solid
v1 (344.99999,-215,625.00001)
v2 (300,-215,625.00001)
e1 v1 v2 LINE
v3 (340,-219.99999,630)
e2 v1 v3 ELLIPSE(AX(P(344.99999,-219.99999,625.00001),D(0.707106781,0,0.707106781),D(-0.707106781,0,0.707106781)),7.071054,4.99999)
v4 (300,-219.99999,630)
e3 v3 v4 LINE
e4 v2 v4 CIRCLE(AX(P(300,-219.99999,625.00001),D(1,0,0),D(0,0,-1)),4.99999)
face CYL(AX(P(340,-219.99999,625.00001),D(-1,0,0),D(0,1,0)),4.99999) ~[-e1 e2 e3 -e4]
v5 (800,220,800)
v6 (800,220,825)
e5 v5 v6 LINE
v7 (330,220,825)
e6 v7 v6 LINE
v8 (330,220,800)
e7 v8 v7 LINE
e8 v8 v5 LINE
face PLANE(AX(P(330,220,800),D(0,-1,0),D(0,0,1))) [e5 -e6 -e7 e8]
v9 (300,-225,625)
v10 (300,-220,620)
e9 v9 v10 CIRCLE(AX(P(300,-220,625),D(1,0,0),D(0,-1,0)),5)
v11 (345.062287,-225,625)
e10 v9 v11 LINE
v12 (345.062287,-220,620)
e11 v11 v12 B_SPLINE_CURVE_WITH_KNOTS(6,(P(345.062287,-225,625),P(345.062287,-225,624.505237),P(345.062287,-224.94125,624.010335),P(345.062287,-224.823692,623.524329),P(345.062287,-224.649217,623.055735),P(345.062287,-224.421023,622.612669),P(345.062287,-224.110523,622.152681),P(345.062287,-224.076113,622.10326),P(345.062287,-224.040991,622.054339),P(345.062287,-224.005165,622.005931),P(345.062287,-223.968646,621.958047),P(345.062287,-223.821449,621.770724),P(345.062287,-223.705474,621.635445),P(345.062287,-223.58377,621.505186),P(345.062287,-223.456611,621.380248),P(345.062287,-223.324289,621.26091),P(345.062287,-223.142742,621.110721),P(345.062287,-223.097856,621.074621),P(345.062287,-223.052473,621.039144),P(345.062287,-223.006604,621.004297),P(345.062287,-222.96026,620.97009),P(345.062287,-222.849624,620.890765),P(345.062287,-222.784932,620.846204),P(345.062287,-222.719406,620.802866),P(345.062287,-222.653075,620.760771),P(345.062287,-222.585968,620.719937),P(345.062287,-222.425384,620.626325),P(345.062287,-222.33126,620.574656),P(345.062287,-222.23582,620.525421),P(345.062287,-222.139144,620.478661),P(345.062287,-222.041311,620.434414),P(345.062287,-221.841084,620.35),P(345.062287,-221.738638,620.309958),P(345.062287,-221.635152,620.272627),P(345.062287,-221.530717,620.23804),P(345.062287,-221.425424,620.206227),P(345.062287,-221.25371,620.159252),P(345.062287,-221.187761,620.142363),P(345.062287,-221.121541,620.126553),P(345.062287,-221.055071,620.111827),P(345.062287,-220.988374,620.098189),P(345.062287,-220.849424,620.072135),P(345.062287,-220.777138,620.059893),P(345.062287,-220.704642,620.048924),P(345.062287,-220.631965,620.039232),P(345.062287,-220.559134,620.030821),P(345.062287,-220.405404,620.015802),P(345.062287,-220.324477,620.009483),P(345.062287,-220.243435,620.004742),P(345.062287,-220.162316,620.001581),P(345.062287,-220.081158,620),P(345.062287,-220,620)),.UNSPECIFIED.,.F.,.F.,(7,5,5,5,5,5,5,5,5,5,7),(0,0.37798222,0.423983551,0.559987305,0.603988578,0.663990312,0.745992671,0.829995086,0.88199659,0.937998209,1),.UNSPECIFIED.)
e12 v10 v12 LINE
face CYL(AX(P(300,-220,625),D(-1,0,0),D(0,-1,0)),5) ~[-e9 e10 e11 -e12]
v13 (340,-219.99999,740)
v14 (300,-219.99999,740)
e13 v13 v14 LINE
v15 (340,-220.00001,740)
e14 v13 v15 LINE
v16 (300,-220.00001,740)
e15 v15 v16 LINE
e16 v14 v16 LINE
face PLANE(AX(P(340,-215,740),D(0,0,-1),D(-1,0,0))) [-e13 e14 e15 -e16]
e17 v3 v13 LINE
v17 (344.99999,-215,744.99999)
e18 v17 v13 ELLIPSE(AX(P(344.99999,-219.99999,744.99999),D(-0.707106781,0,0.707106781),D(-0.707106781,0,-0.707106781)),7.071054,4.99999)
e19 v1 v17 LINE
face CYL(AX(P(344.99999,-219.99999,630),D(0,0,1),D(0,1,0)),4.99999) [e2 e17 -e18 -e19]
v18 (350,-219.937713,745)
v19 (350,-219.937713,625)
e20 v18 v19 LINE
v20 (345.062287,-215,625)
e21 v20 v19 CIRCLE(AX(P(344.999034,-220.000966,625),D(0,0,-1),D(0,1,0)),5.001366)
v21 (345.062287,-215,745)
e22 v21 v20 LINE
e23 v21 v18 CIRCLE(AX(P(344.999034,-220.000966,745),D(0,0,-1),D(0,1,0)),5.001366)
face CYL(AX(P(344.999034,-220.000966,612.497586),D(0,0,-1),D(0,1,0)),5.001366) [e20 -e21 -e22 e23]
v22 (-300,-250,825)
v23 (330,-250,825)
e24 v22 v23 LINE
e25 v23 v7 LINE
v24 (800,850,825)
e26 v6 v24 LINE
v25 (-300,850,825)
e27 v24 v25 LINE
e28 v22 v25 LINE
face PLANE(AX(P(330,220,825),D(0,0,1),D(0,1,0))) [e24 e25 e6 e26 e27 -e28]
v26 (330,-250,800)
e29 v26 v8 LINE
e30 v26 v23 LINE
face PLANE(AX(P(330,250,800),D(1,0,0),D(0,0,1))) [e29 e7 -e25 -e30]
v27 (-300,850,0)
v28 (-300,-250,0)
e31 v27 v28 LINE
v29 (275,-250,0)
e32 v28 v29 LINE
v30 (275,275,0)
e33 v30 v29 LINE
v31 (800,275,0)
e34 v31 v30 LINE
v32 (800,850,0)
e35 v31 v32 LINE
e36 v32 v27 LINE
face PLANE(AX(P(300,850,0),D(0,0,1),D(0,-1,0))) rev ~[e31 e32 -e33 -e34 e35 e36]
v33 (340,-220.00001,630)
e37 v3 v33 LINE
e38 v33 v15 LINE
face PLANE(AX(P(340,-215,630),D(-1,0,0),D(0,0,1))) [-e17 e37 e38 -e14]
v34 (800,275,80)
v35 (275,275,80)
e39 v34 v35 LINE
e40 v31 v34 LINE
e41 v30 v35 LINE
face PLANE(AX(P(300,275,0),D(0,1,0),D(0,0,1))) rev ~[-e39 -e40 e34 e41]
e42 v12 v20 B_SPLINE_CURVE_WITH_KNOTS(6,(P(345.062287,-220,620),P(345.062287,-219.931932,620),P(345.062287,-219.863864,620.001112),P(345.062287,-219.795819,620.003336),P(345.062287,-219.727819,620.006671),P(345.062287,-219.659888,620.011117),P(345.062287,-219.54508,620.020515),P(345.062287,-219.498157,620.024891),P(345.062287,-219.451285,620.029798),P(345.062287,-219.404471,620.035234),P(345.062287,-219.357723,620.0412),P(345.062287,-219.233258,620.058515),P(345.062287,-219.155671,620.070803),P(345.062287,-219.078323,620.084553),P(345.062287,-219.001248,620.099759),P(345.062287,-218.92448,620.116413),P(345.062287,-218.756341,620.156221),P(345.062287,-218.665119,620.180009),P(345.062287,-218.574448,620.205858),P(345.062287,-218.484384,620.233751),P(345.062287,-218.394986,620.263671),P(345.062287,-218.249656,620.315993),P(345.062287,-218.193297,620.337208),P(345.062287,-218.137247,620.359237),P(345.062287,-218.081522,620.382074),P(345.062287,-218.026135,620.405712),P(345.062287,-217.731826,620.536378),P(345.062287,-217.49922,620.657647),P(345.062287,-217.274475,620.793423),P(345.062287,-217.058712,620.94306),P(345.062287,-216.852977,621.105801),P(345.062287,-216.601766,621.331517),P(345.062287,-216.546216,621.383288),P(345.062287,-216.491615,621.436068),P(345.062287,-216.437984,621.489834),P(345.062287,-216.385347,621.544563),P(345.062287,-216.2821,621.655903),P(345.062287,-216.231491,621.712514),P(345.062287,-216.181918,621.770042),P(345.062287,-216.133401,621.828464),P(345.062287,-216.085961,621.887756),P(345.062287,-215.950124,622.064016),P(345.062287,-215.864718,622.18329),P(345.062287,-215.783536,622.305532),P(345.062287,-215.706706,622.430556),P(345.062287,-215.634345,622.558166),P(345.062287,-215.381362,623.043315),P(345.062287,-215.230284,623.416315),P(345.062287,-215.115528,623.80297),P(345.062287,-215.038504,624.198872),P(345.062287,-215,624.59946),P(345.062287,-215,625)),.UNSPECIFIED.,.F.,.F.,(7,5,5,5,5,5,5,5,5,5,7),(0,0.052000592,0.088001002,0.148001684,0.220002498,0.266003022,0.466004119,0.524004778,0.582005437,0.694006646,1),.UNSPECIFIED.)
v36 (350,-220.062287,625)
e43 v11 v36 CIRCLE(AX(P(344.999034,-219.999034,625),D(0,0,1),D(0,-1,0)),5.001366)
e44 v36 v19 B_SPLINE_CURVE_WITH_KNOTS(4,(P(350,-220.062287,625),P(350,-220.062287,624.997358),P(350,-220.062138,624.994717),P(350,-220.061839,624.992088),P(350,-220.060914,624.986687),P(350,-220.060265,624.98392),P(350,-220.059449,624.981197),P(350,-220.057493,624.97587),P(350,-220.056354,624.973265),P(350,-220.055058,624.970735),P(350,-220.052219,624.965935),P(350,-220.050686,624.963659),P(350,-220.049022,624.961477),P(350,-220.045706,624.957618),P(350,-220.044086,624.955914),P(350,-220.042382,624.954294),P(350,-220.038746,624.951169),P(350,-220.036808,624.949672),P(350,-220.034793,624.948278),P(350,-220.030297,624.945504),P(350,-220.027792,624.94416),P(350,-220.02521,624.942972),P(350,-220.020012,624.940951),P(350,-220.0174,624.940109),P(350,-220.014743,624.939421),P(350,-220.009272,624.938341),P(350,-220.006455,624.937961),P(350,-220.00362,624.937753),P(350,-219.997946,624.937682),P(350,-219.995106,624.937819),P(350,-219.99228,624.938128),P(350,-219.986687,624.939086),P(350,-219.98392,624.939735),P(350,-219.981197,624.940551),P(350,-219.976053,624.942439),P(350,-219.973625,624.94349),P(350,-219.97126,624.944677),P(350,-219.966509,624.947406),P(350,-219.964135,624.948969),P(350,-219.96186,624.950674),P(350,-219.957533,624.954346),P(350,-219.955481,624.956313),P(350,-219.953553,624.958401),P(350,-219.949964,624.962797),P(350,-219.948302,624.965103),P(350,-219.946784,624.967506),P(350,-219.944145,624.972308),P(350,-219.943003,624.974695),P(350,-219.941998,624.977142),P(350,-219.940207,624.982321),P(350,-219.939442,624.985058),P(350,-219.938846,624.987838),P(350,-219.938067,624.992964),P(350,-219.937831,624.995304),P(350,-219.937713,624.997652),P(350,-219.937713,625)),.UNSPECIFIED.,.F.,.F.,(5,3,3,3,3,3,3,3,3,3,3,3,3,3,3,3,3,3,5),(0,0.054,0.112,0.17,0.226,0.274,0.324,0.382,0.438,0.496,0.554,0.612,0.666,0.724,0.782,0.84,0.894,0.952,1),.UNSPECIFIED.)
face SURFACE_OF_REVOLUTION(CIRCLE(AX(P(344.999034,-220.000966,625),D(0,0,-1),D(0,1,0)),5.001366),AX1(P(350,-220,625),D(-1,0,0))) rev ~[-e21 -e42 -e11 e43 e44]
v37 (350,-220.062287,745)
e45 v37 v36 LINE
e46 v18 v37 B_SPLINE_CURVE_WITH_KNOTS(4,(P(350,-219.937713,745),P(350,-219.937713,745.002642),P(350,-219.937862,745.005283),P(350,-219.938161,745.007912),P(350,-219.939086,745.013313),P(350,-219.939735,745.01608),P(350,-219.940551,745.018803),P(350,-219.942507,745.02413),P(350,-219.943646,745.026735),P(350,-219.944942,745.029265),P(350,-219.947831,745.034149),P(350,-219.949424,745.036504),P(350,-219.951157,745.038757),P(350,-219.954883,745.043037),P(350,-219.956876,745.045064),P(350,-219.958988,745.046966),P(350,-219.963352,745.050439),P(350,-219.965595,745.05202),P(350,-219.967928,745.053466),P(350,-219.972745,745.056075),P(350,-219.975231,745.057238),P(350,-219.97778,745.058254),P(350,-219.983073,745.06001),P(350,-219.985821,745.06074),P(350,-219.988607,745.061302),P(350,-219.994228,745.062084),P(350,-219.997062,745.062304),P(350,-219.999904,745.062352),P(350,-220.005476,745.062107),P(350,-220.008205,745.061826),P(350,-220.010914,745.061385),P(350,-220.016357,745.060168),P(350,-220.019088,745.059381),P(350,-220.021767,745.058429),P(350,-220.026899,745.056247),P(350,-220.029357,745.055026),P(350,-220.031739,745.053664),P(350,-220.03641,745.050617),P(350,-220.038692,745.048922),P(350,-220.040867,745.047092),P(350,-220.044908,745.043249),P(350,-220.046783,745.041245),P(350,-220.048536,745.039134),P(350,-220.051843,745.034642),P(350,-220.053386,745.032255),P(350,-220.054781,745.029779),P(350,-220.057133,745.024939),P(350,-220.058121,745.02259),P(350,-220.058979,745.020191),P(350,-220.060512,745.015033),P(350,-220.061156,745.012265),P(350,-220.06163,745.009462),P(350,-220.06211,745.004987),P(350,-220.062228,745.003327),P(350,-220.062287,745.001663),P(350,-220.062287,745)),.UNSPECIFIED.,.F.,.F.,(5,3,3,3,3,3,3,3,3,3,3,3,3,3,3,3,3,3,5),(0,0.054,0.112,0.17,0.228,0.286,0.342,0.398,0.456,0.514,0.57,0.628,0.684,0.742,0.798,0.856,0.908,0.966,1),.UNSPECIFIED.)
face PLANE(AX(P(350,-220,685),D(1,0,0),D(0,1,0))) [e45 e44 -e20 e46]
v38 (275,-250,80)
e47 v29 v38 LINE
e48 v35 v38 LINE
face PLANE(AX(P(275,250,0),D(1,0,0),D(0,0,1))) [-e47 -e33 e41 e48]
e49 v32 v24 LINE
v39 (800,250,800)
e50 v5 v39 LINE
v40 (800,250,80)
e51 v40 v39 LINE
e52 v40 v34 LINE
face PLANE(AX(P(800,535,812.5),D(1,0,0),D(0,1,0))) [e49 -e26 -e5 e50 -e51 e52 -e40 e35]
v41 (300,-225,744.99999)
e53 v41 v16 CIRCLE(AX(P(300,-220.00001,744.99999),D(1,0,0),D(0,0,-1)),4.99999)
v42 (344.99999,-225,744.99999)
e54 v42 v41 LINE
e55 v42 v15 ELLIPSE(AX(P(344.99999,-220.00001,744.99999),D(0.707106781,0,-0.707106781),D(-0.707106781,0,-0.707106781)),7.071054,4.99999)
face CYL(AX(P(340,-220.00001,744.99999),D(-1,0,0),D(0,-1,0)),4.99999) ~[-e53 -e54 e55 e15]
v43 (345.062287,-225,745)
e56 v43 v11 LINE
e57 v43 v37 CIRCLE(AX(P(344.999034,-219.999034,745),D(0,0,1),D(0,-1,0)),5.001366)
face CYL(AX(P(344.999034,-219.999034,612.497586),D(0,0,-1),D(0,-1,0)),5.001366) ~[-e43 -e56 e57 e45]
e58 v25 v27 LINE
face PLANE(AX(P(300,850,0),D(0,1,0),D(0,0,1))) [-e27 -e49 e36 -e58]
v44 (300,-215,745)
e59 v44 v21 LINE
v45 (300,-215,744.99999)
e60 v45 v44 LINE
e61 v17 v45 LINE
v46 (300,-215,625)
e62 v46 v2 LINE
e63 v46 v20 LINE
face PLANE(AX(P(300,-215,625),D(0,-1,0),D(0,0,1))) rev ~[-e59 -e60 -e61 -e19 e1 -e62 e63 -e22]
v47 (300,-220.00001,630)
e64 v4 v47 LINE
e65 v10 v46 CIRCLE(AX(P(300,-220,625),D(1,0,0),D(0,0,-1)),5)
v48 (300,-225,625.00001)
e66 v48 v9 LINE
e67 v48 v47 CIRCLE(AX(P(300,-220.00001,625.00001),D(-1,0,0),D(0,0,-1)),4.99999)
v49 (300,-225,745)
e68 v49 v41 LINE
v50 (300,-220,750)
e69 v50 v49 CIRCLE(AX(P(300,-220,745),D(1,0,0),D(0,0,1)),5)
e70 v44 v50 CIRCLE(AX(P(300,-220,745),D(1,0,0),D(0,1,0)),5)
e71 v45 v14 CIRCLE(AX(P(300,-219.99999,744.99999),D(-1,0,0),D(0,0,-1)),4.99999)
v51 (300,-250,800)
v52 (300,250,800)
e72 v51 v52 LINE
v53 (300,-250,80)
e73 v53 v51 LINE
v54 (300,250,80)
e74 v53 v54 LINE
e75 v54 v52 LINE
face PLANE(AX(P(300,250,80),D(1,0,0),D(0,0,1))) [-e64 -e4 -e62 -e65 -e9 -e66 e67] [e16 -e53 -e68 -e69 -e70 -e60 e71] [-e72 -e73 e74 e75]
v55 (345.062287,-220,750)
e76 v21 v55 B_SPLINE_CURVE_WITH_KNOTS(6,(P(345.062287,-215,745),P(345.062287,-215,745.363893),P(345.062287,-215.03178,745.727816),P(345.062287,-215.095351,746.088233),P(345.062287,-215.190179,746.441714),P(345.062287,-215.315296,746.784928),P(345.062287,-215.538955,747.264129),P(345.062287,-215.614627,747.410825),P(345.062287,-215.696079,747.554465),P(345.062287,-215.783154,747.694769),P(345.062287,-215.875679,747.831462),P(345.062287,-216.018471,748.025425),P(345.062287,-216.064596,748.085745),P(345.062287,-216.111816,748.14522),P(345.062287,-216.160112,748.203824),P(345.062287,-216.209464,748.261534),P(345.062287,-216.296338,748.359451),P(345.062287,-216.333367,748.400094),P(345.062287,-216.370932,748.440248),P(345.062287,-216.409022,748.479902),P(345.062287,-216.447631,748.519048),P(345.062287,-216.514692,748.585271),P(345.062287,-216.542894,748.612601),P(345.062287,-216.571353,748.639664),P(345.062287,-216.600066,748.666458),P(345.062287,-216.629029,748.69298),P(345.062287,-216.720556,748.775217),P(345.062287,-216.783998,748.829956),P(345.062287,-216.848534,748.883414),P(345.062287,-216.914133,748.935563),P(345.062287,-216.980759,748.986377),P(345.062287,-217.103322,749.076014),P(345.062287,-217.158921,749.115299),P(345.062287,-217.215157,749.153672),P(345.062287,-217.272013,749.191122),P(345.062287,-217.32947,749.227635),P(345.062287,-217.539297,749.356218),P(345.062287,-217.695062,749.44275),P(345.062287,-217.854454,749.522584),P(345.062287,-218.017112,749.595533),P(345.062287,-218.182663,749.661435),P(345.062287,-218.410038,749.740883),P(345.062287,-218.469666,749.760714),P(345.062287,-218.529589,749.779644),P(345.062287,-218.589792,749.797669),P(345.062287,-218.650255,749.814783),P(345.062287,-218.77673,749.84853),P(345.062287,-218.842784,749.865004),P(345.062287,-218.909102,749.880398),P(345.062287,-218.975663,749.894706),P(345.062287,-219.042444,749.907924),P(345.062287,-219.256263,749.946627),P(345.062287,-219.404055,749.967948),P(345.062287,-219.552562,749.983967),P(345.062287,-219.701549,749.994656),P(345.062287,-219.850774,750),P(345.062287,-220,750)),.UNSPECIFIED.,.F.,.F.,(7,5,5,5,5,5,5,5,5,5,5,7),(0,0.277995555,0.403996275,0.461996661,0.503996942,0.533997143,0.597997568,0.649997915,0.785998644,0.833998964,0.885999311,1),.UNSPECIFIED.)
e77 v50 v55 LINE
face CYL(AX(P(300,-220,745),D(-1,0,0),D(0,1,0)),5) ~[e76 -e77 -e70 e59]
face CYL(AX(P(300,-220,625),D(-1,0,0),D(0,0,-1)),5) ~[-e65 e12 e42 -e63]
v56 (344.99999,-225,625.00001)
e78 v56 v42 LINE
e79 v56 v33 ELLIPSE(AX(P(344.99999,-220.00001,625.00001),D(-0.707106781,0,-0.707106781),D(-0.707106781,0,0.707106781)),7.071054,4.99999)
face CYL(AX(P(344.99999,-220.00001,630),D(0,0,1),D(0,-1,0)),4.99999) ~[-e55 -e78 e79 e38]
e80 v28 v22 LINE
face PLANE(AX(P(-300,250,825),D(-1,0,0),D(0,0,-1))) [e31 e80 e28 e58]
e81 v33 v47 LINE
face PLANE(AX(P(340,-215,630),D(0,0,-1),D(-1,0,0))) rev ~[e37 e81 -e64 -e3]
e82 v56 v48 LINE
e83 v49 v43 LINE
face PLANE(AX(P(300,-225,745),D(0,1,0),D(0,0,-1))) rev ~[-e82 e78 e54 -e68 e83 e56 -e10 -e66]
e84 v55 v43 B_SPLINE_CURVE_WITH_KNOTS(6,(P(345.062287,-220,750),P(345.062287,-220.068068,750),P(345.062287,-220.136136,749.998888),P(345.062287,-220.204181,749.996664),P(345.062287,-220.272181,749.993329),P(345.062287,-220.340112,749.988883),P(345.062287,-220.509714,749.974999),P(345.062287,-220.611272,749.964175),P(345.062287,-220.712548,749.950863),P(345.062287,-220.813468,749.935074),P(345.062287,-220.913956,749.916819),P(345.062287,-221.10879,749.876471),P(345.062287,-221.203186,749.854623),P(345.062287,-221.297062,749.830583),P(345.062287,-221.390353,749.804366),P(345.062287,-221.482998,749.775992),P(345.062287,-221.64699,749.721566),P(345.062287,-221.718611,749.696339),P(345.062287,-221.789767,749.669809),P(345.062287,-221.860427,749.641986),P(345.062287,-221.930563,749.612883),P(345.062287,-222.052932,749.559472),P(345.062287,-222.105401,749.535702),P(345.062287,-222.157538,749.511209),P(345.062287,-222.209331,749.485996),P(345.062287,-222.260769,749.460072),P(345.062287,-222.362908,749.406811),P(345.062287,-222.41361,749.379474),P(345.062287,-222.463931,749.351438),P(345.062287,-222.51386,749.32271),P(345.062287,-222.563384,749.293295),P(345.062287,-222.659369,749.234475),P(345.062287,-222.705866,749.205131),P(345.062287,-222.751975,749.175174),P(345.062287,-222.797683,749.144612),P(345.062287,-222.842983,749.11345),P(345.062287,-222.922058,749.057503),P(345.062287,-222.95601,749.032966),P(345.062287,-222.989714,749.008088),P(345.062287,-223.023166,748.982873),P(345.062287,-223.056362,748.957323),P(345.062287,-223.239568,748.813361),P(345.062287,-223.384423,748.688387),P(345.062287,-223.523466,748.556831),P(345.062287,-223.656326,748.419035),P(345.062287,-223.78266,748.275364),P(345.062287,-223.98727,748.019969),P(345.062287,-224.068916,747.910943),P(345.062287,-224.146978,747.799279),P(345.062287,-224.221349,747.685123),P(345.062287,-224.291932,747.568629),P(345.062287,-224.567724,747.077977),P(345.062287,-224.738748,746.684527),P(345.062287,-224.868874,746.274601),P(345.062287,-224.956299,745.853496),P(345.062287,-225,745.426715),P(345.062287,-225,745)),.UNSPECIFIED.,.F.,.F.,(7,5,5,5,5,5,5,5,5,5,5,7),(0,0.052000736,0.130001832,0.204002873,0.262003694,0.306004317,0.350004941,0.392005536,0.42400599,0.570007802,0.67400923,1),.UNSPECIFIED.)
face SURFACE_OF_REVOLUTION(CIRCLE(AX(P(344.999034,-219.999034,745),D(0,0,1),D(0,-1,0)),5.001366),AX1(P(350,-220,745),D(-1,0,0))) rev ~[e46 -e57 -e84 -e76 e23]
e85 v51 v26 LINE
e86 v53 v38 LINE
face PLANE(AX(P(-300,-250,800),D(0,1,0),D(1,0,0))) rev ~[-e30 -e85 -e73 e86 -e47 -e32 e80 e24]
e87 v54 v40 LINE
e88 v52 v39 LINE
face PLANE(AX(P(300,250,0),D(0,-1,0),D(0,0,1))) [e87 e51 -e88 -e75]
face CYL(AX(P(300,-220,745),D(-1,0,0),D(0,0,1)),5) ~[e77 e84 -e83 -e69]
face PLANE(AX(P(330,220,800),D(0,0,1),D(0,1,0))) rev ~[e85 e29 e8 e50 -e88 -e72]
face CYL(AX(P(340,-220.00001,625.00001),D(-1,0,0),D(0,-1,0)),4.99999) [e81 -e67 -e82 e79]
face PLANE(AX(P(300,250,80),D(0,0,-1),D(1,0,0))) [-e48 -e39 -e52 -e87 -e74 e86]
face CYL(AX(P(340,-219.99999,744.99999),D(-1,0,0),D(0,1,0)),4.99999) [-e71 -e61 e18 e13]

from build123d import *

# Parameters (mm, degrees)
F0_W        = 600
F0_H        = 500
F1_DEPTH    = 800
F2_W        = 500
F2_H        = 80
F3_DEPTH    = 25
F5_DEPTH    = 50
F6_T1_DEPTH = 145.0048285071
F6_T4_ANGLE = 180
F6_T6_ANGLE = 180
F7_W        = 40
F7_H        = 110
F8_DEPTH    = 25
F9_R        = 4.99999
F10_W       = 630
F10_H       = 500
F11_DEPTH   = 25
F12_DEPTH   = 600
F13_W       = 600
F13_H       = 800
F14_DEPTH   = 500
F15_W       = 630
F15_H       = 25
F16_DEPTH   = 470
F17_W       = 500
F17_H       = 80
F18_DEPTH   = 25
F19_W       = 575
F19_H       = 80
F20_DEPTH   = 25


# Not quite as in the source:
# - a fillet or chamfer that OpenCascade refuses, or shapes differently, is made with other operations: its cross-section is extruded or revolved along the edge and cut away or added
# - a fillet or chamfer is up to 0.001 mm smaller than in the source, because OpenCascade refuses the exact size


with BuildPart() as f1:
    # F0 (on Top) → F1 (new body)
    with BuildSketch(Plane.XY):
        Rectangle(F0_W, F0_H)
    extrude(amount=F1_DEPTH)

    # F2 (on face) → F3 (cut)
    with BuildSketch(Plane.YZ.offset(300)):
        with Locations((0, 40)):
            Rectangle(F2_W, F2_H)
    extrude(amount=-F3_DEPTH, mode=Mode.SUBTRACT)

    # F4 (on face) → F5 (join)
    with BuildSketch(Plane.YZ.offset(300)):
        with BuildLine():
            ThreePointArc((-220, 750), (-223.5355339059, 748.5355339059), (-225, 745))
            Line((-225, 745), (-225, 625))
            ThreePointArc((-225, 625), (-223.5355339059, 621.4644660941), (-220, 620))
            ThreePointArc((-220, 620), (-216.4644660941, 621.4644660941), (-215, 625))
            Line((-215, 625), (-215, 745))
            ThreePointArc((-215, 745), (-216.4644660941, 748.5355339059), (-220, 750))
        make_face()
    extrude(amount=F5_DEPTH)

    # F6: fillet of radius 5 on 4 edges, made by hand

    # F6_s2 → F6_t1 (cut)
    with BuildSketch(Plane.XY.offset(612.4975857464)):
        with BuildLine():
            ThreePointArc((344.9990343146, -225.0004), (348.5355339059, -223.5355339059), (350.0004, -219.9990343146))
            Line((350.0004, -219.9990343146), (350.5005365685, -219.9990343146))
            ThreePointArc((350.5005365685, -219.9990343146), (350.5001365685, -222.4995171573), (350.5001365685, -225))
            Line((350.5001365685, -225), (350, -225.5001365685))
            ThreePointArc((350, -225.5001365685), (347.4995171573, -225.5001365685), (344.9990343146, -225.5005365685))
            Line((344.9990343146, -225.5005365685), (344.9990343146, -225.0004))
        make_face()
        with BuildLine():
            ThreePointArc((344.9990343146, -214.9996), (348.5355339059, -216.4644660941), (350.0004, -220.0009656854))
            Line((350.0004, -220.0009656854), (350.5005365685, -220.0009656854))
            ThreePointArc((350.5005365685, -220.0009656854), (350.5001365685, -217.5004828427), (350.5001365685, -215))
            Line((350.5001365685, -215), (350, -214.4998634315))
            ThreePointArc((350, -214.4998634315), (347.4995171573, -214.4998634315), (344.9990343146, -214.4994634315))
            Line((344.9990343146, -214.4994634315), (344.9990343146, -214.9996))
        make_face()
    extrude(amount=F6_T1_DEPTH, mode=Mode.SUBTRACT)

    # F6_s3 → F6_t4 (revolve, cut)
    with BuildSketch(Plane.XY.offset(745)):
        with BuildLine():
            ThreePointArc((344.9990343146, -225.0004), (348.5351924681, -223.5358753108), (350.0003999068, -220))
            Line((350.0003999068, -220), (350.5005364913, -220))
            Line((350.5005364913, -220), (350.5001365685, -225))
            Line((350.5001365685, -225), (350, -225.5001365685))
            ThreePointArc((350, -225.5001365685), (347.4995171573, -225.5001365685), (344.9990343146, -225.5005365685))
            Line((344.9990343146, -225.5005365685), (344.9990343146, -225.0004))
        make_face()
    revolve(axis=Axis((350, -220, 745), (-1, 0, 0)), revolution_arc=F6_T4_ANGLE, mode=Mode.SUBTRACT)

    # F6_s5 → F6_t6 (revolve, cut)
    with BuildSketch(Plane.XY.offset(625)):
        with BuildLine():
            ThreePointArc((344.9990343146, -214.9996), (348.5351924681, -216.4641246892), (350.0003999068, -220))
            Line((350.0003999068, -220), (350.5005364913, -220))
            Line((350.5005364913, -220), (350.5001365685, -215))
            Line((350.5001365685, -215), (350, -214.4998634315))
            ThreePointArc((350, -214.4998634315), (347.4995171573, -214.4998634315), (344.9990343146, -214.4994634315))
            Line((344.9990343146, -214.4994634315), (344.9990343146, -214.9996))
        make_face()
    revolve(axis=Axis((350, -220, 625), (-1, 0, 0)), revolution_arc=F6_T6_ANGLE, mode=Mode.SUBTRACT)

    # F7 (on face) → F8 (cut)
    with BuildSketch(Plane(origin=(0, -215, 0), x_dir=(-1, 0, 0), z_dir=(0, 1, 0))):
        with Locations((-320, 685)):
            Rectangle(F7_W, F7_H)
    extrude(amount=-F8_DEPTH, mode=Mode.SUBTRACT)

    # F9 (radius 5 in the source; OpenCascade refuses exactly that, so slightly less here)
    f9_edges = [f1.edges().sort_by_distance(p)[0] for p in [
        (320, -215, 740),
        (340, -215, 685),
        (320, -215, 630),
        (320, -225, 740),
        (340, -225, 685),
        (320, -225, 630),
    ]]
    fillet(f9_edges, radius=F9_R)

    # F10 (on face) → F11 (join)
    with BuildSketch(Plane.XY.offset(800)):
        with Locations((15, 0)):
            Rectangle(F10_W, F10_H)
    extrude(amount=F11_DEPTH)

    # F12 (add): a face of the model
    f12_faces = [f1.faces().sort_by_distance(p)[0] for p in [
        (-0.6860759494, 250, 414.6164556962),
    ]]
    extrude(f12_faces, amount=F12_DEPTH)

    # F13 (on face) → F14 (join)
    with BuildSketch(Plane.YZ.offset(300)):
        with Locations((550, 400)):
            Rectangle(F13_W, F13_H)
    extrude(amount=F14_DEPTH)

    # F15 (on face) → F16 (join)
    with BuildSketch(Plane.YZ.offset(330)):
        with Locations((535, 812.5)):
            Rectangle(F15_W, F15_H)
    extrude(amount=F16_DEPTH)

    # F17 (on face) → F18 (cut)
    with BuildSketch(Plane.XZ.offset(-250)):
        with Locations((550, 40)):
            Rectangle(F17_W, F17_H)
    extrude(amount=-F18_DEPTH, mode=Mode.SUBTRACT)

    # F19 (on face) → F20 (join)
    with BuildSketch(Plane(origin=(300, 0, 0), x_dir=(0, -1, 0), z_dir=(-1, 0, 0))):
        with Locations((-562.5, 40)):
            Rectangle(F19_W, F19_H)
    extrude(amount=F20_DEPTH)


solid = f1.part
